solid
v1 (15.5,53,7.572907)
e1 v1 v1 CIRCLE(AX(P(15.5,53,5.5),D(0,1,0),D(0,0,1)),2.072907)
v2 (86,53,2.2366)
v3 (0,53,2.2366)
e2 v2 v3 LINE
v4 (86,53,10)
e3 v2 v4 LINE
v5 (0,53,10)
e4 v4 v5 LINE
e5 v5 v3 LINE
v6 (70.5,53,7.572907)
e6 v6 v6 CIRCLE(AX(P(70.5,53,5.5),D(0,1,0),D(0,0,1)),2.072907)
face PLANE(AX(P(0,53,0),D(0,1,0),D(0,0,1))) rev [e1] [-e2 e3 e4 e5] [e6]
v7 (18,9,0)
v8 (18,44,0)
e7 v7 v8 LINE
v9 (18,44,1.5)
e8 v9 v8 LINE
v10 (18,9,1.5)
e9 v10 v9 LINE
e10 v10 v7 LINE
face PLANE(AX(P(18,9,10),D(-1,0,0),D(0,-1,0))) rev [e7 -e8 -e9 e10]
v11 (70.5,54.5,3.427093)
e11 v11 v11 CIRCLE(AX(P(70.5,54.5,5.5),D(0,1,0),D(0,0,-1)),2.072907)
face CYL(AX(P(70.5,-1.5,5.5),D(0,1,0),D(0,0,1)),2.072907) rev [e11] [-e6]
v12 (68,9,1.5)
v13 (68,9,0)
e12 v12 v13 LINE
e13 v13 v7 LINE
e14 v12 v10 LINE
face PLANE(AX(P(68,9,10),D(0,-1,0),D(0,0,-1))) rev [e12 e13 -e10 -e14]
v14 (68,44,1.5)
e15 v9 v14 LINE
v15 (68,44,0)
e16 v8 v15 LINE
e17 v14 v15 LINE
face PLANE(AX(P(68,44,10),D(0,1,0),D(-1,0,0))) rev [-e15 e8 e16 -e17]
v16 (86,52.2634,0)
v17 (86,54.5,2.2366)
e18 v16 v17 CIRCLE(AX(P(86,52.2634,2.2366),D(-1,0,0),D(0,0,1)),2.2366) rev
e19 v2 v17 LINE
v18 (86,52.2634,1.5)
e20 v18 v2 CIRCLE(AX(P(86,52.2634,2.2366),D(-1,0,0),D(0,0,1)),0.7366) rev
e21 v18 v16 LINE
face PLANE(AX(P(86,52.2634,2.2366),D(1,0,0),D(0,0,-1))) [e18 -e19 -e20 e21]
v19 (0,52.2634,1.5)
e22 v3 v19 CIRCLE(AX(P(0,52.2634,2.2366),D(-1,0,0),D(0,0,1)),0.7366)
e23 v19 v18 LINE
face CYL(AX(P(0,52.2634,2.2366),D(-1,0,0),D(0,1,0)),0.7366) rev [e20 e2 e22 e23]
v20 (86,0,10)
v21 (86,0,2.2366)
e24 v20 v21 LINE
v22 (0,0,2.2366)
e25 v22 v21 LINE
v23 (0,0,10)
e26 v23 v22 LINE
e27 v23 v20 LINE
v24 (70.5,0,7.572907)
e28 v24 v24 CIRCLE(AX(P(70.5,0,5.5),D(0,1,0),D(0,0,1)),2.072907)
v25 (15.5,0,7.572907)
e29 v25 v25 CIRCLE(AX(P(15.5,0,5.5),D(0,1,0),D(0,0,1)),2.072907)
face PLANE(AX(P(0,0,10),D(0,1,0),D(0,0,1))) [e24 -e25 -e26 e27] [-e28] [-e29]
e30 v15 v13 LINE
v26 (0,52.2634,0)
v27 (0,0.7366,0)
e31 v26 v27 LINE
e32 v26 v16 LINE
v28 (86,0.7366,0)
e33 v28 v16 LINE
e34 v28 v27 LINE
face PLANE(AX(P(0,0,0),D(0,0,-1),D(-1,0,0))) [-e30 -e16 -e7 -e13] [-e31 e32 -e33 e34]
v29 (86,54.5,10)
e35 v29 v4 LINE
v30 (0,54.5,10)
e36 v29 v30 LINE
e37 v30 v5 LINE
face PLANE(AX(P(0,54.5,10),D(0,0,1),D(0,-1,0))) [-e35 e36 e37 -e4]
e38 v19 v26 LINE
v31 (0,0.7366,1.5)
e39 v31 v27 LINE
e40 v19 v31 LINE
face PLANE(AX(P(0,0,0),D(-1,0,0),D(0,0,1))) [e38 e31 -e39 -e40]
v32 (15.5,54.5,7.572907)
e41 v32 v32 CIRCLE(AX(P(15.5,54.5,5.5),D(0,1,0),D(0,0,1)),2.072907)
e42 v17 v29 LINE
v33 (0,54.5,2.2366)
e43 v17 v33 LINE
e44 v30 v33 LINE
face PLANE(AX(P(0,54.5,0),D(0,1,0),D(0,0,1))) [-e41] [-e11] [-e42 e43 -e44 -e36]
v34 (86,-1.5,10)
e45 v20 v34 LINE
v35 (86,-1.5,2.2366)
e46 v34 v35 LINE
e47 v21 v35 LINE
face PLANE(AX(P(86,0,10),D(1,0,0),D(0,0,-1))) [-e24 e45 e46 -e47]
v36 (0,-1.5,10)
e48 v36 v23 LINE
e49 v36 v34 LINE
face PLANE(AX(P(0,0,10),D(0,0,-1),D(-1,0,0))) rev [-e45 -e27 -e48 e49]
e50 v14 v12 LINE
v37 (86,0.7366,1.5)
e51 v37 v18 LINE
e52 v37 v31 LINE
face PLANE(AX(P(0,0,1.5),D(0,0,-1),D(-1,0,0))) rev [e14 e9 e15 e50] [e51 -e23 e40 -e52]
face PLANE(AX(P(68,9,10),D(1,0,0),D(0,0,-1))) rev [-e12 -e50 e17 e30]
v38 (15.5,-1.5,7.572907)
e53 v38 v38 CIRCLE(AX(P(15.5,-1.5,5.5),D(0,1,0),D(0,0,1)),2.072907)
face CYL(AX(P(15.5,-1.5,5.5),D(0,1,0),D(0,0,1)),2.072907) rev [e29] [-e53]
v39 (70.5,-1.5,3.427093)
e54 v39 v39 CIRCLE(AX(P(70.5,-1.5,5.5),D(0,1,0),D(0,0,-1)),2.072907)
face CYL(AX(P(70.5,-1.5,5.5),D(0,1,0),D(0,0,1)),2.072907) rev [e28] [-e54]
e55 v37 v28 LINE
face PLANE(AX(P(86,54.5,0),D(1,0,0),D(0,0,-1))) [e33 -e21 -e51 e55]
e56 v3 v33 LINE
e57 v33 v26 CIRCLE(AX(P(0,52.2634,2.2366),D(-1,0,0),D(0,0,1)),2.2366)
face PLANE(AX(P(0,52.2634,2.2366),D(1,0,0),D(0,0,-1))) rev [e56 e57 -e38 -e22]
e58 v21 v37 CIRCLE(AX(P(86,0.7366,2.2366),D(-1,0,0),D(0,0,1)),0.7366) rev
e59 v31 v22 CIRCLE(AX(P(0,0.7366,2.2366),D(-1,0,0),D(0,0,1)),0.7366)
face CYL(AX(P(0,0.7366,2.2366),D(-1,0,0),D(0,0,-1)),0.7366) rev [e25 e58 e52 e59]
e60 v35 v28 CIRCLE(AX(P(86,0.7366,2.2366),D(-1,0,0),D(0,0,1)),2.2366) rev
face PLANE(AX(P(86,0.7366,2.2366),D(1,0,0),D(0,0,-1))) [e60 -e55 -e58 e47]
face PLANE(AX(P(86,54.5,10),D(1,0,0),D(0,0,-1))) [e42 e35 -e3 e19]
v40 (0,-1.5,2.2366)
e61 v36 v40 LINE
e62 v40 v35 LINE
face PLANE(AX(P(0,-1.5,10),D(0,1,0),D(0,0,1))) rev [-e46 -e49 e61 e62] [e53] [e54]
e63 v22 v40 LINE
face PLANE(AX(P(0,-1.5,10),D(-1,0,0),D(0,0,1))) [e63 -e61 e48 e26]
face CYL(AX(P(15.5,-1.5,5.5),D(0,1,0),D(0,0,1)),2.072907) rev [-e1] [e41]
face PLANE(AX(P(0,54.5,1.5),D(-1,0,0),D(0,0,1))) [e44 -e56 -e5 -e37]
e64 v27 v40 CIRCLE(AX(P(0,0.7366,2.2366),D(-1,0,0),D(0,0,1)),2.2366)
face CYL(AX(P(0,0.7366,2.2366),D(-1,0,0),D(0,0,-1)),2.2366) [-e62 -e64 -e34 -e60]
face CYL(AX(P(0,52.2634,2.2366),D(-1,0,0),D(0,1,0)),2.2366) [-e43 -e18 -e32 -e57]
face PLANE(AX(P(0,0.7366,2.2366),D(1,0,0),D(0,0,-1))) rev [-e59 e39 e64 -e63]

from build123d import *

# Parameters (mm, degrees)
SKETCH_2_W                       = 86
SKETCH_2_H                       = 1.5
SM_BASE_FLANGE_1_DEPTH           = 10
SM_EDGE_FLANGE_1_STRIP_W         = 7.4732
SM_EDGE_FLANGE_1_STRIP_H         = 1.5
SM_EDGE_FLANGE_1_STRIP_CUT_DEPTH = 86
SM_EDGE_FLANGE_1_DEPTH           = 86
SM_EDGE_FLANGE_2_STRIP_W         = 7.4732
SM_EDGE_FLANGE_2_STRIP_H         = 1.5
SM_EDGE_FLANGE_2_STRIP_CUT_DEPTH = 86
SM_EDGE_FLANGE_2_DEPTH           = 86
SKETCH_13_W                      = 50
SKETCH_13_H                      = 35
CUT_EXTRUDE_1_DEPTH              = 10
SKETCH_14_R                      = 2.072907101
CUT_EXTRUDE_2_DEPTH              = 104.111590037


# Sheet-metal steps are written as plain solids
with BuildPart() as part:
    # Sketch 2 → 基体-法兰1 (new body)
    with BuildSketch(Plane.XY):
        with Locations((43, -0.75)):
            Rectangle(SKETCH_2_W, SKETCH_2_H)
    extrude(amount=SM_BASE_FLANGE_1_DEPTH)

    # 边线-法兰1 strip (across the edge) → 边线-法兰1 strip cut (cut)
    with BuildSketch(Plane.ZY.offset(-86)):
        with Locations((-1.5, -0.75)):
            Rectangle(SM_EDGE_FLANGE_1_STRIP_W, SM_EDGE_FLANGE_1_STRIP_H)
    extrude(amount=SM_EDGE_FLANGE_1_STRIP_CUT_DEPTH, mode=Mode.SUBTRACT)

    # 边线-法兰1 section (across the edge) → 边线-法兰1 (add)
    with BuildSketch(Plane.ZY.offset(-86)):
        with BuildLine():
            Line((0, 0.7366), (0, 54.5))
            Line((0, 54.5), (1.5, 54.5))
            Line((1.5, 54.5), (1.5, 0.7366))
            ThreePointArc((1.5, 0.7366), (1.715745145, 0.215745145), (2.2366, 0))
            Line((2.2366, 0), (2.2366, -1.5))
            ThreePointArc((2.2366, -1.5), (0.655084973, -0.844915027), (0, 0.7366))
        make_face()
    extrude(amount=SM_EDGE_FLANGE_1_DEPTH)

    # 边线-法兰2 strip (across the edge) → 边线-法兰2 strip cut (cut)
    with BuildSketch(Plane(origin=(86, 54.5, 1.5), x_dir=(0, -1, 0), z_dir=(-1, 0, 0))):
        with Locations((-1.5, -0.75)):
            Rectangle(SM_EDGE_FLANGE_2_STRIP_W, SM_EDGE_FLANGE_2_STRIP_H)
    extrude(amount=SM_EDGE_FLANGE_2_STRIP_CUT_DEPTH, mode=Mode.SUBTRACT)

    # 边线-法兰2 section (across the edge) → 边线-法兰2 (add)
    with BuildSketch(Plane(origin=(86, 54.5, 1.5), x_dir=(0, -1, 0), z_dir=(-1, 0, 0))):
        with BuildLine():
            Line((0, 0.7366), (0, 8.5))
            Line((0, 8.5), (1.5, 8.5))
            Line((1.5, 8.5), (1.5, 0.7366))
            ThreePointArc((1.5, 0.7366), (1.715745145, 0.215745145), (2.2366, 0))
            Line((2.2366, 0), (2.2366, -1.5))
            ThreePointArc((2.2366, -1.5), (0.655084973, -0.844915027), (0, 0.7366))
        make_face()
    extrude(amount=SM_EDGE_FLANGE_2_DEPTH)

    # 草图13 → 切除-拉伸1 (cut)
    with BuildSketch(Plane(origin=(0, 0, 0), x_dir=(-1, 0, 0), z_dir=(0, 0, -1))):
        with Locations((-43, 26.5)):
            Rectangle(SKETCH_13_W, SKETCH_13_H)
    extrude(amount=-CUT_EXTRUDE_1_DEPTH, mode=Mode.SUBTRACT)

    # 草图14 → 切除-拉伸2 (cut, through all)
    with BuildSketch(Plane(origin=(0, 54.5, 0), x_dir=(1, 0, 0), z_dir=(0, 1, 0))):
        with Locations(Location((15.5, -5.5, 0), (0, 0, 270))):
            Circle(SKETCH_14_R)
        with Locations(Location((70.5, -5.5, 0), (0, 0, 270))):
            Circle(SKETCH_14_R)
    extrude(amount=-CUT_EXTRUDE_2_DEPTH, mode=Mode.SUBTRACT)


solid = part.part
